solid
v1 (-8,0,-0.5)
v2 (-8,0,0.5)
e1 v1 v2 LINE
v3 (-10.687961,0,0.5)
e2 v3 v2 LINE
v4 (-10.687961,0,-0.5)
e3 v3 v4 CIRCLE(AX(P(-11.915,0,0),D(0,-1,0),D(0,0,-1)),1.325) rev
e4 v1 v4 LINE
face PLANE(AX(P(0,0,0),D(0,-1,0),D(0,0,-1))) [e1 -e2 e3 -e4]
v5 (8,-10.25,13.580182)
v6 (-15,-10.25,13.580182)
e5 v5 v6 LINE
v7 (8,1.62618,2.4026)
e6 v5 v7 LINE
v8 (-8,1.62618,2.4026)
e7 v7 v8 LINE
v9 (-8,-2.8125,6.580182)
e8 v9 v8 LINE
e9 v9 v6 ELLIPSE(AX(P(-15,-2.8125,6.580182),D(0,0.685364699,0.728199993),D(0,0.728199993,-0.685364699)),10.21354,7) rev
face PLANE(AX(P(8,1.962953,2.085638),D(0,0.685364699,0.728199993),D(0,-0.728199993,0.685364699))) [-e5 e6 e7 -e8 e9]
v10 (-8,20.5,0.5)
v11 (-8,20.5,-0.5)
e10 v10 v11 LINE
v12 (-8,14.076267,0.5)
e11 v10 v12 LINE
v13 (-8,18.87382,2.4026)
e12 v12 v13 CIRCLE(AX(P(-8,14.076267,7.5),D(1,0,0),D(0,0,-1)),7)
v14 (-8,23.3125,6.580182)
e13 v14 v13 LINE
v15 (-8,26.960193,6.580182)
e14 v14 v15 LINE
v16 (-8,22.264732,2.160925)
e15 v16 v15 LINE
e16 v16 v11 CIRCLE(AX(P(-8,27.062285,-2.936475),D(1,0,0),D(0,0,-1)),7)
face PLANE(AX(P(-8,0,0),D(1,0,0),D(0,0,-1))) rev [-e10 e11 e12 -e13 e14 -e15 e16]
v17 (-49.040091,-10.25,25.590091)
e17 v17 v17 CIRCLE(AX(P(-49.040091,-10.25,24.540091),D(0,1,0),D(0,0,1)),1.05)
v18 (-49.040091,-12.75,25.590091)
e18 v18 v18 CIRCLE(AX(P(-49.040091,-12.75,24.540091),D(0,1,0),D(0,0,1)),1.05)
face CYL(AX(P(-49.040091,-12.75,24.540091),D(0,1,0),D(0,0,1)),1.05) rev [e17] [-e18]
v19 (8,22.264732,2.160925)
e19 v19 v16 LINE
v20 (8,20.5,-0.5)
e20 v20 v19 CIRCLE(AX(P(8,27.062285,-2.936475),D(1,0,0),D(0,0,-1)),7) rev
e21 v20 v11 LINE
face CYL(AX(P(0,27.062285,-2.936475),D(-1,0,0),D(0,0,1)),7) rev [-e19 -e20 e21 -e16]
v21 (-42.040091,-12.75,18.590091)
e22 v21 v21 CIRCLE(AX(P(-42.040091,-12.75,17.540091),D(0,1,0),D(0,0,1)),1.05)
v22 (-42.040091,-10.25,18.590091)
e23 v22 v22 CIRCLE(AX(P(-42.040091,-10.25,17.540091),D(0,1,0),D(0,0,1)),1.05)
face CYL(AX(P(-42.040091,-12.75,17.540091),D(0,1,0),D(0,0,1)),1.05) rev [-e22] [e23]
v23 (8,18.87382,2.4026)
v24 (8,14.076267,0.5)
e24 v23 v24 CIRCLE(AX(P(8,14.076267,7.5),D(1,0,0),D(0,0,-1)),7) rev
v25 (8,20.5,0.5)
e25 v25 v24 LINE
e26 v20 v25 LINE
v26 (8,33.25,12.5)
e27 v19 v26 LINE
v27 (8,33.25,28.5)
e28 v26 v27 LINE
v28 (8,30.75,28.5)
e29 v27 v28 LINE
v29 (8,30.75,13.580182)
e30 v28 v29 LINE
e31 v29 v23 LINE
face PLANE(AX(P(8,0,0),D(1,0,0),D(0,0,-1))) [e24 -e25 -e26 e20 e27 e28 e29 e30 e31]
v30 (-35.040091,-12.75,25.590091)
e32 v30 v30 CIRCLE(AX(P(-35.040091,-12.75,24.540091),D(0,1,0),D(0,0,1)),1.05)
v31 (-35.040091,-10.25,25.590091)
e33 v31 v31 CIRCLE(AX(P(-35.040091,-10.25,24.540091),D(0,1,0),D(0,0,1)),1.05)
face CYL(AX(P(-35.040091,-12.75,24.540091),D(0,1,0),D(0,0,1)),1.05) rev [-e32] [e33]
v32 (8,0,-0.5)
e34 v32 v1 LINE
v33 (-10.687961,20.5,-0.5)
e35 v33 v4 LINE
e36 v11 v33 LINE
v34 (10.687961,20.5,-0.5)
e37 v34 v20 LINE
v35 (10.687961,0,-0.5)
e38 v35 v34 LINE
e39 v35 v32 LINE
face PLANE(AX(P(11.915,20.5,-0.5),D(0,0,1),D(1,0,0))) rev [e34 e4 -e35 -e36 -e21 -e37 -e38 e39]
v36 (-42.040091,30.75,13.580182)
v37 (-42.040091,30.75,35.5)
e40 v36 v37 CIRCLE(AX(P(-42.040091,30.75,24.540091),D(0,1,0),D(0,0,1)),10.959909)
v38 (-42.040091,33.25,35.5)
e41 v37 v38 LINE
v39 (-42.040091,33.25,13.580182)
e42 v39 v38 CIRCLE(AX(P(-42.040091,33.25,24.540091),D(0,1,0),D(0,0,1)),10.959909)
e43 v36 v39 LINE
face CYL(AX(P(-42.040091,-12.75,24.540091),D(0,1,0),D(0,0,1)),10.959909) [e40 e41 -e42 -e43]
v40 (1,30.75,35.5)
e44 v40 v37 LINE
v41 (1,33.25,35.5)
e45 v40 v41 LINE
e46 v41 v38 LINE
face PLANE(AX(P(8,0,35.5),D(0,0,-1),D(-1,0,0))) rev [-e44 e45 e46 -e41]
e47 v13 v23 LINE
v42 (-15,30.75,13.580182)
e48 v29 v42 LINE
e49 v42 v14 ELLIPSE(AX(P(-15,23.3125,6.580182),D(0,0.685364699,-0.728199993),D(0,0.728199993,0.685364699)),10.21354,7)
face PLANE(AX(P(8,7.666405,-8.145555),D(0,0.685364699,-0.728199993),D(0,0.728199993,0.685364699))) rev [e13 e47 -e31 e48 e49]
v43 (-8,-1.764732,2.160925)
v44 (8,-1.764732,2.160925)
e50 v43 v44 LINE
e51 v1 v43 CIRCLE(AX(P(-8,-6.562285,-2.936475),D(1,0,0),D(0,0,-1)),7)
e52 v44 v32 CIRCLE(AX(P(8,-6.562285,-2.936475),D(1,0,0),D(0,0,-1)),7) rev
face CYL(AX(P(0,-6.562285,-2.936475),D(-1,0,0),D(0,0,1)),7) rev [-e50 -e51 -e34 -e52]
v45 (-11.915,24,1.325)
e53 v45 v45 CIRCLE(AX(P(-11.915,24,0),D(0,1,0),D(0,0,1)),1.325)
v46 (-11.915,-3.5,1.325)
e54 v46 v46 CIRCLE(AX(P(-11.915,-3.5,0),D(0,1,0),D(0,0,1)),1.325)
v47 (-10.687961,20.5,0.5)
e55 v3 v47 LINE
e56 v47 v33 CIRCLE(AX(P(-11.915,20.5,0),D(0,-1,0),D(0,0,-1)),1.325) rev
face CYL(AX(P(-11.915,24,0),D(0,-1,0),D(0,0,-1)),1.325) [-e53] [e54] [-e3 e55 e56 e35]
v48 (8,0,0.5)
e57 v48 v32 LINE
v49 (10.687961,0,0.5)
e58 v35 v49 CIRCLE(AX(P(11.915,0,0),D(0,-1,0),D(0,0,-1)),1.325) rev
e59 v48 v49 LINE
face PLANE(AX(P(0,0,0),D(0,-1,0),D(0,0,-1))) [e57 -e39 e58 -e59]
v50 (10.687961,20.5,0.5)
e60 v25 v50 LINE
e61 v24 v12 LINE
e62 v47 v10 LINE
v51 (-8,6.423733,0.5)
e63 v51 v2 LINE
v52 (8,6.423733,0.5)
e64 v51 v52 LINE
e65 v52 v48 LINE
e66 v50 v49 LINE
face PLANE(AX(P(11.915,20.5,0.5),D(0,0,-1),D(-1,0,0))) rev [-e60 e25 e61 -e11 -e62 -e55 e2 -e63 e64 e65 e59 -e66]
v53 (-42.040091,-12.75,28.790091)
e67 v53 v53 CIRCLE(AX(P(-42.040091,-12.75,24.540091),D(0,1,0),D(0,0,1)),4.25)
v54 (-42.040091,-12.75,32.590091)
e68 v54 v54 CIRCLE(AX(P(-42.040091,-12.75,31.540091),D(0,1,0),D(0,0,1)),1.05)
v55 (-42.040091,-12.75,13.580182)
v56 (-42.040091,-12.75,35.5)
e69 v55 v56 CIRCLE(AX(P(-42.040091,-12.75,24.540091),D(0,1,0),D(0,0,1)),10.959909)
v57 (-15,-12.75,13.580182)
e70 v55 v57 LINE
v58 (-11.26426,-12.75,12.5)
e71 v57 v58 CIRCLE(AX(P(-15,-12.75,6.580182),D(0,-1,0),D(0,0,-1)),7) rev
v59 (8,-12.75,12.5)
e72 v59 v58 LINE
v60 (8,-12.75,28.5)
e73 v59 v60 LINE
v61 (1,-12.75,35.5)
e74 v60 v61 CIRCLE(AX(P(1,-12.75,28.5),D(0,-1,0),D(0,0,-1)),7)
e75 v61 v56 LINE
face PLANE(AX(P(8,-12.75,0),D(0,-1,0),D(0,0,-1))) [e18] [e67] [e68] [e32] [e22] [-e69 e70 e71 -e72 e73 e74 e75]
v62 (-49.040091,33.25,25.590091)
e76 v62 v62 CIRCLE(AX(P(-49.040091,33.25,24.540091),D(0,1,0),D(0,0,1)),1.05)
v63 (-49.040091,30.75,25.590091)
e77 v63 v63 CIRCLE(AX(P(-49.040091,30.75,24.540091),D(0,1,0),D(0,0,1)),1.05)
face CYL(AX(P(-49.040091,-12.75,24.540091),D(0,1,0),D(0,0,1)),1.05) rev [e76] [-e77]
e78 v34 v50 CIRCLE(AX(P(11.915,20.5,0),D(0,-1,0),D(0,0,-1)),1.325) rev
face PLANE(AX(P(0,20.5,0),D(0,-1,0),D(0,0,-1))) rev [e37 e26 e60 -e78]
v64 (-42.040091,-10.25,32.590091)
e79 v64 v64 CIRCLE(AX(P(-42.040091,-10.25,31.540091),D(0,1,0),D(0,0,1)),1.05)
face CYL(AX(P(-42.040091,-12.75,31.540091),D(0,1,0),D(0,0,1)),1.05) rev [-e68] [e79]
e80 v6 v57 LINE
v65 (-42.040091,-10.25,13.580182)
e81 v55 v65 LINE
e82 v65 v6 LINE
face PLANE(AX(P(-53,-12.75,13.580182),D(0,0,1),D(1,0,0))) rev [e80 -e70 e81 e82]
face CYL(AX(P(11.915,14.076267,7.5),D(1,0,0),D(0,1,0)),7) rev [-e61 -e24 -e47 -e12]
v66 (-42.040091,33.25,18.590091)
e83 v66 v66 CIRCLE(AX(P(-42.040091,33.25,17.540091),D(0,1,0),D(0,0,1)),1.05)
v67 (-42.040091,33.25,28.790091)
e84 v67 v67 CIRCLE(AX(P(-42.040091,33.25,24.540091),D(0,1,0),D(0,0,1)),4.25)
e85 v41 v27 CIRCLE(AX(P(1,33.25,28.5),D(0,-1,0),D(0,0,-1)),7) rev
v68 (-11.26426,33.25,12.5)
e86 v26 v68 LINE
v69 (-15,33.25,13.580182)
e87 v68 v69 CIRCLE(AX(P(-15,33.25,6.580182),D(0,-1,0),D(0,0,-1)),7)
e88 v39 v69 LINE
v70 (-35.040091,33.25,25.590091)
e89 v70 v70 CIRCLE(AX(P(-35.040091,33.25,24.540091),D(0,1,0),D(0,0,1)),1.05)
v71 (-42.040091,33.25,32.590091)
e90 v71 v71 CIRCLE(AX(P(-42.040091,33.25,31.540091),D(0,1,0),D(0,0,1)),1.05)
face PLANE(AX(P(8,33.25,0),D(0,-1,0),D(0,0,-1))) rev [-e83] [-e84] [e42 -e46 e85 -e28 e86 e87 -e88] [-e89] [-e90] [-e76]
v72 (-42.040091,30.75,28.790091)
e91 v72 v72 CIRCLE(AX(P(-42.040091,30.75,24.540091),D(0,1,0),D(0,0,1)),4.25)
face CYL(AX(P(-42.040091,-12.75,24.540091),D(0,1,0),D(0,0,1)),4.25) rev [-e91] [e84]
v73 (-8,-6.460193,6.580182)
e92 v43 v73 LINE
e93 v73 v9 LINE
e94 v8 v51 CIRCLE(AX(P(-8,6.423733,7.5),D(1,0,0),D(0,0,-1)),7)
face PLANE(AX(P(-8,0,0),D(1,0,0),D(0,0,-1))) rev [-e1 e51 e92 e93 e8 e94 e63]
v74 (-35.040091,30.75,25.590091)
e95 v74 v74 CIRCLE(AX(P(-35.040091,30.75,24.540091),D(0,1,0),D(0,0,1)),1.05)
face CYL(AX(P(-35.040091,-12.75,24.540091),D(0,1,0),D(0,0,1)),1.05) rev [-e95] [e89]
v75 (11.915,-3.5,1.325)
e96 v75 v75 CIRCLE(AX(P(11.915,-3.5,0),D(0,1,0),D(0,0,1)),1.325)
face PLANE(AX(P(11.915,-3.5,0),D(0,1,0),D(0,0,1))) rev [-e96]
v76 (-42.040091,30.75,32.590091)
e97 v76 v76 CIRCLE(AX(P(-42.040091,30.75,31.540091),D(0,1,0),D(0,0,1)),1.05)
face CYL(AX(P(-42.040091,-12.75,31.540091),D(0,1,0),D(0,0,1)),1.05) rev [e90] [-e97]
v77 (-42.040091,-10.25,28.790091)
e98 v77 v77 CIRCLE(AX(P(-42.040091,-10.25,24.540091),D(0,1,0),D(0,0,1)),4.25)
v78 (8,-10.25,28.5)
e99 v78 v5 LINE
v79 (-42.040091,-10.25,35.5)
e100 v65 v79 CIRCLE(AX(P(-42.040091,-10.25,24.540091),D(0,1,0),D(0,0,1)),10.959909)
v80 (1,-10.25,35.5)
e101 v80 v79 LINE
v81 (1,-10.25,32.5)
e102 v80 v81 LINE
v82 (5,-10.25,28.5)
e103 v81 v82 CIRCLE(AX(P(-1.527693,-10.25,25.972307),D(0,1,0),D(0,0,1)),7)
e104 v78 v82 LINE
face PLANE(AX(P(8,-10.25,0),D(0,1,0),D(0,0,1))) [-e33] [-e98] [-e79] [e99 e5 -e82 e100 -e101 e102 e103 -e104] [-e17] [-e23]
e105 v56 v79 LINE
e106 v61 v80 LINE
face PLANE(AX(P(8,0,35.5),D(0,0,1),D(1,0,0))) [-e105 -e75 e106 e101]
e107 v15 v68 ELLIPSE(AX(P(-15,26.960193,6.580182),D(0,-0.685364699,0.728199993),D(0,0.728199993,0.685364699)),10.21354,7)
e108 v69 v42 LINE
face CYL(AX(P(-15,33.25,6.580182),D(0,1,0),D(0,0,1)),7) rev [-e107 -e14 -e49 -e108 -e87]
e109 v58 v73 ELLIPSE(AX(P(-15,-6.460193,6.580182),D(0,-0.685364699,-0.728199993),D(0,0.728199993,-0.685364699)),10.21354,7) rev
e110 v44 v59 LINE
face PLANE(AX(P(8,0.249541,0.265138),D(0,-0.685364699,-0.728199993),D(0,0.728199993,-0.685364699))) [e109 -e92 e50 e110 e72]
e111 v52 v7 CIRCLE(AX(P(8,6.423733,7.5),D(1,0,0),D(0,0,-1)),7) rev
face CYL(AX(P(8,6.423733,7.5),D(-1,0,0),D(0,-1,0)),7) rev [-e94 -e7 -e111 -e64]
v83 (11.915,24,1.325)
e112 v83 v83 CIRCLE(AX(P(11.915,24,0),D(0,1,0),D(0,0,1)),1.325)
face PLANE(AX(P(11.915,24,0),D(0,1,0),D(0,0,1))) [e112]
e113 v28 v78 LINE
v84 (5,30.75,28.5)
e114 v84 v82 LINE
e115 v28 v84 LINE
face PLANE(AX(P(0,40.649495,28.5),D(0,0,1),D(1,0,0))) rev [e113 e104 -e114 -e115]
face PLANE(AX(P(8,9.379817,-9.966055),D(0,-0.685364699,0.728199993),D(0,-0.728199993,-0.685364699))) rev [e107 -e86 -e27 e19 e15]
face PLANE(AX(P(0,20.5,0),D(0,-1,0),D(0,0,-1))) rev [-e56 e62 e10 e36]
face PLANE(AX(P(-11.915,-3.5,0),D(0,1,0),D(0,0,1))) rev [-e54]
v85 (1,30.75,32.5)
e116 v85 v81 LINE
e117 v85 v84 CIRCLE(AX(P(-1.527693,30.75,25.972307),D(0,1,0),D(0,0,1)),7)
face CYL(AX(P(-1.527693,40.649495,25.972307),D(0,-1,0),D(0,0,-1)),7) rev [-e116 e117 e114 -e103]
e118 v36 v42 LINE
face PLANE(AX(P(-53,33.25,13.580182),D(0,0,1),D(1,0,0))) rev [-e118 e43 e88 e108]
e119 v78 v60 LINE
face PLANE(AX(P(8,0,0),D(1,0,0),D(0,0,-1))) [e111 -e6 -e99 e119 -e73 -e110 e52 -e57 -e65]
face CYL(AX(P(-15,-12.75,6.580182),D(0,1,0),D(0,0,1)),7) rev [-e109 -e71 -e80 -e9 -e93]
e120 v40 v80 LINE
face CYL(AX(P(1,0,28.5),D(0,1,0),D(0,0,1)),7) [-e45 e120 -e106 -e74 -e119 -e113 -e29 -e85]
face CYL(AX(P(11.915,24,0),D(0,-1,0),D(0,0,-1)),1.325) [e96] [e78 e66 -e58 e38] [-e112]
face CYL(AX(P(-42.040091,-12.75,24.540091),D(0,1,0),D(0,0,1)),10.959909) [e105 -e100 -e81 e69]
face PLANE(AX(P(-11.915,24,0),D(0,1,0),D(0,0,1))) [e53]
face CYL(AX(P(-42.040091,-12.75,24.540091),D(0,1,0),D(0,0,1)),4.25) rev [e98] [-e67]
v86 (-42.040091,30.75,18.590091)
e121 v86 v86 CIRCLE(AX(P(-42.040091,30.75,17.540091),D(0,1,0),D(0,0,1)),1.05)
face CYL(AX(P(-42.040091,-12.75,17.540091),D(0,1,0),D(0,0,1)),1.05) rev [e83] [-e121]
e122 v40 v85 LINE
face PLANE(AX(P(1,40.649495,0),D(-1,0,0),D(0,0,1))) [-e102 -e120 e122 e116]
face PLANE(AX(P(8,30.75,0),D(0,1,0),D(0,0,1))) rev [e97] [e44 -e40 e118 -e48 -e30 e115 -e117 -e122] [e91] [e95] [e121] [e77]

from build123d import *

# Parameters (mm, degrees)
SKETCH1_W           = 23.83
SKETCH1_H           = 1
BOSS_EXTRUDE1_DEPTH = 20.5
SKETCH2_R           = 1.325
BOSS_EXTRUDE2_DEPTH = 13.75
BOSS_EXTRUDE4_DEPTH = 8
SKETCH5_W           = 21.919818374
SKETCH5_H           = 2.5
BOSS_EXTRUDE5_DEPTH = 45
SKETCH6_R           = 4.25
SKETCH6_R_2         = 1.05
CUT_EXTRUDE1_DEPTH  = 79.646360374
FILLET1_R           = 7
FILLET2_R           = 7
FILLET3_R           = 7
BOSS_EXTRUDE6_START = 41
BOSS_EXTRUDE6_DEPTH = 41


with BuildPart() as part:
    # Sketch1 → Boss-Extrude1 (new body)
    with BuildSketch(Plane(origin=(0, 0, 0), x_dir=(1, 0, 0), z_dir=(0, 1, 0))):
        Rectangle(SKETCH1_W, SKETCH1_H)
    extrude(amount=BOSS_EXTRUDE1_DEPTH)

    # Sketch2 → Boss-Extrude2 (add, symmetric)
    with BuildSketch(Plane(origin=(0, 10.25, 0), x_dir=(1, 0, 0), z_dir=(0, 1, 0))):
        with Locations(Location((-11.915, 0, 0), (0, 0, 270))):
            Circle(SKETCH2_R)
        with Locations(Location((11.915, 0, 0), (0, 0, 270))):
            Circle(SKETCH2_R)
    extrude(amount=BOSS_EXTRUDE2_DEPTH, both=True)

    # Sketch4 → Boss-Extrude4 (add, symmetric)
    with BuildSketch(Plane(origin=(0, 0, 0), x_dir=(0, 0, -1), z_dir=(1, 0, 0))):
        Polygon((-0.5, 16.852307022), (-0.5, 20.5), (-12.5, 33.25), (-35.5, 33.25), (-35.5, 30.75), (-13.580181626, 30.75), align=None)
        Polygon((-0.5, 0), (-0.5, 3.647692978), (-13.580181626, -10.25), (-35.5, -10.25), (-35.5, -12.75), (-12.5, -12.75), align=None)
    extrude(amount=BOSS_EXTRUDE4_DEPTH, both=True)

    # Sketch5 → Boss-Extrude5 (add)
    with BuildSketch(Plane.ZY.offset(8)):
        with Locations((24.540090813, 32)):
            Rectangle(SKETCH5_W, SKETCH5_H)
        with Locations((24.540090813, -11.5)):
            Rectangle(SKETCH5_W, SKETCH5_H)
    extrude(amount=BOSS_EXTRUDE5_DEPTH)

    # Sketch6 → Cut-Extrude1 (cut, through all)
    with BuildSketch(Plane(origin=(0, 33.25, 0), x_dir=(1, 0, 0), z_dir=(0, 1, 0))):
        with Locations(Location((-42.040090813, -24.540090813, 0), (0, 0, 270))):
            Circle(SKETCH6_R)
        with Locations(Location((-49.040090813, -24.540090813, 0), (0, 0, 270))):
            Circle(SKETCH6_R_2)
        with Locations(Location((-42.040090813, -17.540090813, 0), (0, 0, 270))):
            Circle(SKETCH6_R_2)
        with Locations(Location((-35.040090813, -24.540090813, 0), (0, 0, 270))):
            Circle(SKETCH6_R_2)
        with Locations(Location((-42.040090813, -31.540090813, 0), (0, 0, 270))):
            Circle(SKETCH6_R_2)
        with BuildLine():
            ThreePointArc((-53, -24.540090813), (-49.78991692, -16.790264706), (-42.040090813, -13.580181626))
            Line((-42.040090813, -13.580181626), (-53, -13.580181626))
            Line((-53, -13.580181626), (-53, -24.540090813))
        make_face()
        with BuildLine():
            ThreePointArc((-42.040090813, -35.5), (-49.78991692, -32.28991692), (-53, -24.540090813))
            Line((-53, -24.540090813), (-53, -35.5))
            Line((-53, -35.5), (-42.040090813, -35.5))
        make_face()
    extrude(amount=-CUT_EXTRUDE1_DEPTH, mode=Mode.SUBTRACT)

    # Fillet1
    # the kernel refuses this fillet: 7 mm, written as the material it adds along each edge
    with BuildSketch(Plane(origin=(-8, -12.75, 13.580181626), x_dir=(-1, 0, 0), z_dir=(0, 1, 0))) as fillet1_piece_1_section:
        with BuildLine():
            CenterArc((FILLET1_R, -FILLET1_R), FILLET1_R, 90, 90)
            Line((0, -FILLET1_R), (0, 0))
            Line((0, 0), (FILLET1_R, 0))
        make_face()
    fillet1_piece_1 = extrude(amount=2.5, mode=Mode.PRIVATE)
    fillet1_piece_1 = split(fillet1_piece_1, bisect_by=Plane(origin=(-10.020174451, -12.153760937, 11.938833823), z_dir=(0, 0.6853646990049913, 0.7281999926928027)), keep=Keep.TOP, mode=Mode.PRIVATE)
    fillet1_piece_1 = split(fillet1_piece_1, bisect_by=Plane(origin=(-10.020174451, -10.440349189, 13.759333804), z_dir=(0, -0.685364699004991, -0.7281999926928029)), keep=Keep.TOP, mode=Mode.PRIVATE)
    add(fillet1_piece_1)
    with BuildSketch(Plane(origin=(-8, -12.75, 13.580181626), x_dir=(-1, 0, 0), z_dir=(0, 1, 0))) as fillet1_piece_2_section:
        with BuildLine():
            CenterArc((FILLET1_R, -FILLET1_R), FILLET1_R, 90, 90)
            Line((0, -FILLET1_R), (0, 0))
            Line((0, 0), (FILLET1_R, 0))
        make_face()
    fillet1_piece_2 = extrude(amount=20, mode=Mode.PRIVATE)
    fillet1_piece_2 = split(fillet1_piece_2, bisect_by=Plane(origin=(-8.816209607, -9.698679662, 9.628169093), z_dir=(0, 0.6853646990049913, 0.7281999926928027)), keep=Keep.TOP, mode=Mode.PRIVATE)
    fillet1_piece_2 = split(fillet1_piece_2, bisect_by=Plane(origin=(-8.816209607, -10.25, 10.809130305), z_dir=(0, 1, 0)), keep=Keep.TOP, mode=Mode.PRIVATE)
    fillet1_piece_2 = split(fillet1_piece_2, bisect_by=Plane(origin=(-8.816209607, -7.985267914, 11.448669075), z_dir=(0, -0.685364699004991, -0.7281999926928029)), keep=Keep.TOP, mode=Mode.PRIVATE)
    add(fillet1_piece_2)
    with BuildSketch(Plane(origin=(-8, 33.25, 13.580181626), x_dir=(0, 0, -1), z_dir=(0, -1, 0))) as fillet1_piece_3_section:
        with BuildLine():
            CenterArc((FILLET1_R, -FILLET1_R), FILLET1_R, 90, 90)
            Line((0, -FILLET1_R), (0, 0))
            Line((0, 0), (FILLET1_R, 0))
        make_face()
    fillet1_piece_3 = extrude(amount=2.5, mode=Mode.PRIVATE)
    fillet1_piece_3 = split(fillet1_piece_3, bisect_by=Plane(origin=(-10.020174451, 32.653760936, 11.938833823), z_dir=(0, -0.6853646990049912, 0.7281999926928028)), keep=Keep.TOP, mode=Mode.PRIVATE)
    fillet1_piece_3 = split(fillet1_piece_3, bisect_by=Plane(origin=(-10.020174451, 30.940349189, 13.759333804), z_dir=(0, 0.6853646990049909, -0.7281999926928031)), keep=Keep.TOP, mode=Mode.PRIVATE)
    add(fillet1_piece_3)
    with BuildSketch(Plane(origin=(-8, 33.25, 13.580181626), x_dir=(0, 0, -1), z_dir=(0, -1, 0))) as fillet1_piece_4_section:
        with BuildLine():
            CenterArc((FILLET1_R, -FILLET1_R), FILLET1_R, 90, 90)
            Line((0, -FILLET1_R), (0, 0))
            Line((0, 0), (FILLET1_R, 0))
        make_face()
    fillet1_piece_4 = extrude(amount=20, mode=Mode.PRIVATE)
    fillet1_piece_4 = split(fillet1_piece_4, bisect_by=Plane(origin=(-8.816209616, 30.198679665, 9.628169097), z_dir=(0, -0.6853646990049912, 0.7281999926928028)), keep=Keep.TOP, mode=Mode.PRIVATE)
    fillet1_piece_4 = split(fillet1_piece_4, bisect_by=Plane(origin=(-8.816209616, 28.485267918, 11.448669078), z_dir=(0, 0.6853646990049909, -0.7281999926928031)), keep=Keep.TOP, mode=Mode.PRIVATE)
    fillet1_piece_4 = split(fillet1_piece_4, bisect_by=Plane(origin=(-8.816209616, 30.75, 10.809130308), z_dir=(0, -1, 0)), keep=Keep.TOP, mode=Mode.PRIVATE)
    add(fillet1_piece_4)
    # the kernel refuses this fillet: 7 mm, written as the material it takes off along each edge
    with BuildSketch(Plane(origin=(8, 7.25, 35.5), x_dir=(0, 0, -1), z_dir=(0, -1, 0))) as fillet1_2_piece_1:
        with BuildLine():
            CenterArc((FILLET1_R, -FILLET1_R), FILLET1_R, 90, 90)
            Line((0, -FILLET1_R), (0, 0))
            Line((0, 0), (FILLET1_R, 0))
        make_face()
    extrude(amount=37.5, mode=Mode.SUBTRACT)
    with BuildSketch(Plane(origin=(8, 50.75, 35.5), x_dir=(-1, 0, 0), z_dir=(0, -1, 0))) as fillet1_2_piece_2:
        with BuildLine():
            CenterArc((FILLET1_R, FILLET1_R), FILLET1_R, 180, 90)
            Line((0, FILLET1_R), (0, 0))
            Line((0, 0), (FILLET1_R, 0))
        make_face()
    extrude(amount=37.5, mode=Mode.SUBTRACT)

    # Fillet2
    fillet2_edges = [part.edges().sort_by_distance(p)[0] for p in [
        (0, 16.852307022, 0.5),
        (0, 3.647692978, 0.5),
    ]]
    fillet(fillet2_edges, radius=FILLET2_R)

    # Fillet3
    # the kernel refuses this fillet: 7 mm, written as the material it adds along each edge
    with BuildSketch(Plane(origin=(-8, 20.5, 0.5), x_dir=(0, 0.7281999926925888, 0.6853646990052185), z_dir=(1, 0, 0))) as fillet3_piece_1:
        with BuildLine():
            CenterArc((2.423417163, -7), FILLET3_R, 90, 26.366519243)
            Line((-0.685364699, -0.728199993), (0, 0))
            Line((0, 0), (2.423417163, 0))
        make_face()
    extrude(amount=16)
    with BuildSketch(Plane(origin=(8, 0, 0.5), x_dir=(0, 0, -1), z_dir=(-1, 0, 0))) as fillet3_piece_2:
        with BuildLine():
            CenterArc((3.436475374, 6.562285254), FILLET3_R, 223.264295411, 26.366519243)
            Line((-1.660924575, 1.764732361), (0, 0))
            Line((0, 0), (1, 0))
        make_face()
    extrude(amount=16)

    # Sketch8 → Boss-Extrude6 (add)
    with BuildSketch(Plane(origin=(0, -10.25, 0), x_dir=(1, 0, 0), z_dir=(0, 1, 0)).offset(BOSS_EXTRUDE6_START)):
        with BuildLine():
            ThreePointArc((1, -35.5), (5.949747468, -33.449747468), (8, -28.5))
            Line((8, -28.5), (5, -28.5))
            ThreePointArc((5, -28.5), (3.422054899, -30.922054899), (1, -32.5))
            Line((1, -32.5), (1, -35.5))
        make_face()
    extrude(amount=-BOSS_EXTRUDE6_DEPTH)


solid = part.part
